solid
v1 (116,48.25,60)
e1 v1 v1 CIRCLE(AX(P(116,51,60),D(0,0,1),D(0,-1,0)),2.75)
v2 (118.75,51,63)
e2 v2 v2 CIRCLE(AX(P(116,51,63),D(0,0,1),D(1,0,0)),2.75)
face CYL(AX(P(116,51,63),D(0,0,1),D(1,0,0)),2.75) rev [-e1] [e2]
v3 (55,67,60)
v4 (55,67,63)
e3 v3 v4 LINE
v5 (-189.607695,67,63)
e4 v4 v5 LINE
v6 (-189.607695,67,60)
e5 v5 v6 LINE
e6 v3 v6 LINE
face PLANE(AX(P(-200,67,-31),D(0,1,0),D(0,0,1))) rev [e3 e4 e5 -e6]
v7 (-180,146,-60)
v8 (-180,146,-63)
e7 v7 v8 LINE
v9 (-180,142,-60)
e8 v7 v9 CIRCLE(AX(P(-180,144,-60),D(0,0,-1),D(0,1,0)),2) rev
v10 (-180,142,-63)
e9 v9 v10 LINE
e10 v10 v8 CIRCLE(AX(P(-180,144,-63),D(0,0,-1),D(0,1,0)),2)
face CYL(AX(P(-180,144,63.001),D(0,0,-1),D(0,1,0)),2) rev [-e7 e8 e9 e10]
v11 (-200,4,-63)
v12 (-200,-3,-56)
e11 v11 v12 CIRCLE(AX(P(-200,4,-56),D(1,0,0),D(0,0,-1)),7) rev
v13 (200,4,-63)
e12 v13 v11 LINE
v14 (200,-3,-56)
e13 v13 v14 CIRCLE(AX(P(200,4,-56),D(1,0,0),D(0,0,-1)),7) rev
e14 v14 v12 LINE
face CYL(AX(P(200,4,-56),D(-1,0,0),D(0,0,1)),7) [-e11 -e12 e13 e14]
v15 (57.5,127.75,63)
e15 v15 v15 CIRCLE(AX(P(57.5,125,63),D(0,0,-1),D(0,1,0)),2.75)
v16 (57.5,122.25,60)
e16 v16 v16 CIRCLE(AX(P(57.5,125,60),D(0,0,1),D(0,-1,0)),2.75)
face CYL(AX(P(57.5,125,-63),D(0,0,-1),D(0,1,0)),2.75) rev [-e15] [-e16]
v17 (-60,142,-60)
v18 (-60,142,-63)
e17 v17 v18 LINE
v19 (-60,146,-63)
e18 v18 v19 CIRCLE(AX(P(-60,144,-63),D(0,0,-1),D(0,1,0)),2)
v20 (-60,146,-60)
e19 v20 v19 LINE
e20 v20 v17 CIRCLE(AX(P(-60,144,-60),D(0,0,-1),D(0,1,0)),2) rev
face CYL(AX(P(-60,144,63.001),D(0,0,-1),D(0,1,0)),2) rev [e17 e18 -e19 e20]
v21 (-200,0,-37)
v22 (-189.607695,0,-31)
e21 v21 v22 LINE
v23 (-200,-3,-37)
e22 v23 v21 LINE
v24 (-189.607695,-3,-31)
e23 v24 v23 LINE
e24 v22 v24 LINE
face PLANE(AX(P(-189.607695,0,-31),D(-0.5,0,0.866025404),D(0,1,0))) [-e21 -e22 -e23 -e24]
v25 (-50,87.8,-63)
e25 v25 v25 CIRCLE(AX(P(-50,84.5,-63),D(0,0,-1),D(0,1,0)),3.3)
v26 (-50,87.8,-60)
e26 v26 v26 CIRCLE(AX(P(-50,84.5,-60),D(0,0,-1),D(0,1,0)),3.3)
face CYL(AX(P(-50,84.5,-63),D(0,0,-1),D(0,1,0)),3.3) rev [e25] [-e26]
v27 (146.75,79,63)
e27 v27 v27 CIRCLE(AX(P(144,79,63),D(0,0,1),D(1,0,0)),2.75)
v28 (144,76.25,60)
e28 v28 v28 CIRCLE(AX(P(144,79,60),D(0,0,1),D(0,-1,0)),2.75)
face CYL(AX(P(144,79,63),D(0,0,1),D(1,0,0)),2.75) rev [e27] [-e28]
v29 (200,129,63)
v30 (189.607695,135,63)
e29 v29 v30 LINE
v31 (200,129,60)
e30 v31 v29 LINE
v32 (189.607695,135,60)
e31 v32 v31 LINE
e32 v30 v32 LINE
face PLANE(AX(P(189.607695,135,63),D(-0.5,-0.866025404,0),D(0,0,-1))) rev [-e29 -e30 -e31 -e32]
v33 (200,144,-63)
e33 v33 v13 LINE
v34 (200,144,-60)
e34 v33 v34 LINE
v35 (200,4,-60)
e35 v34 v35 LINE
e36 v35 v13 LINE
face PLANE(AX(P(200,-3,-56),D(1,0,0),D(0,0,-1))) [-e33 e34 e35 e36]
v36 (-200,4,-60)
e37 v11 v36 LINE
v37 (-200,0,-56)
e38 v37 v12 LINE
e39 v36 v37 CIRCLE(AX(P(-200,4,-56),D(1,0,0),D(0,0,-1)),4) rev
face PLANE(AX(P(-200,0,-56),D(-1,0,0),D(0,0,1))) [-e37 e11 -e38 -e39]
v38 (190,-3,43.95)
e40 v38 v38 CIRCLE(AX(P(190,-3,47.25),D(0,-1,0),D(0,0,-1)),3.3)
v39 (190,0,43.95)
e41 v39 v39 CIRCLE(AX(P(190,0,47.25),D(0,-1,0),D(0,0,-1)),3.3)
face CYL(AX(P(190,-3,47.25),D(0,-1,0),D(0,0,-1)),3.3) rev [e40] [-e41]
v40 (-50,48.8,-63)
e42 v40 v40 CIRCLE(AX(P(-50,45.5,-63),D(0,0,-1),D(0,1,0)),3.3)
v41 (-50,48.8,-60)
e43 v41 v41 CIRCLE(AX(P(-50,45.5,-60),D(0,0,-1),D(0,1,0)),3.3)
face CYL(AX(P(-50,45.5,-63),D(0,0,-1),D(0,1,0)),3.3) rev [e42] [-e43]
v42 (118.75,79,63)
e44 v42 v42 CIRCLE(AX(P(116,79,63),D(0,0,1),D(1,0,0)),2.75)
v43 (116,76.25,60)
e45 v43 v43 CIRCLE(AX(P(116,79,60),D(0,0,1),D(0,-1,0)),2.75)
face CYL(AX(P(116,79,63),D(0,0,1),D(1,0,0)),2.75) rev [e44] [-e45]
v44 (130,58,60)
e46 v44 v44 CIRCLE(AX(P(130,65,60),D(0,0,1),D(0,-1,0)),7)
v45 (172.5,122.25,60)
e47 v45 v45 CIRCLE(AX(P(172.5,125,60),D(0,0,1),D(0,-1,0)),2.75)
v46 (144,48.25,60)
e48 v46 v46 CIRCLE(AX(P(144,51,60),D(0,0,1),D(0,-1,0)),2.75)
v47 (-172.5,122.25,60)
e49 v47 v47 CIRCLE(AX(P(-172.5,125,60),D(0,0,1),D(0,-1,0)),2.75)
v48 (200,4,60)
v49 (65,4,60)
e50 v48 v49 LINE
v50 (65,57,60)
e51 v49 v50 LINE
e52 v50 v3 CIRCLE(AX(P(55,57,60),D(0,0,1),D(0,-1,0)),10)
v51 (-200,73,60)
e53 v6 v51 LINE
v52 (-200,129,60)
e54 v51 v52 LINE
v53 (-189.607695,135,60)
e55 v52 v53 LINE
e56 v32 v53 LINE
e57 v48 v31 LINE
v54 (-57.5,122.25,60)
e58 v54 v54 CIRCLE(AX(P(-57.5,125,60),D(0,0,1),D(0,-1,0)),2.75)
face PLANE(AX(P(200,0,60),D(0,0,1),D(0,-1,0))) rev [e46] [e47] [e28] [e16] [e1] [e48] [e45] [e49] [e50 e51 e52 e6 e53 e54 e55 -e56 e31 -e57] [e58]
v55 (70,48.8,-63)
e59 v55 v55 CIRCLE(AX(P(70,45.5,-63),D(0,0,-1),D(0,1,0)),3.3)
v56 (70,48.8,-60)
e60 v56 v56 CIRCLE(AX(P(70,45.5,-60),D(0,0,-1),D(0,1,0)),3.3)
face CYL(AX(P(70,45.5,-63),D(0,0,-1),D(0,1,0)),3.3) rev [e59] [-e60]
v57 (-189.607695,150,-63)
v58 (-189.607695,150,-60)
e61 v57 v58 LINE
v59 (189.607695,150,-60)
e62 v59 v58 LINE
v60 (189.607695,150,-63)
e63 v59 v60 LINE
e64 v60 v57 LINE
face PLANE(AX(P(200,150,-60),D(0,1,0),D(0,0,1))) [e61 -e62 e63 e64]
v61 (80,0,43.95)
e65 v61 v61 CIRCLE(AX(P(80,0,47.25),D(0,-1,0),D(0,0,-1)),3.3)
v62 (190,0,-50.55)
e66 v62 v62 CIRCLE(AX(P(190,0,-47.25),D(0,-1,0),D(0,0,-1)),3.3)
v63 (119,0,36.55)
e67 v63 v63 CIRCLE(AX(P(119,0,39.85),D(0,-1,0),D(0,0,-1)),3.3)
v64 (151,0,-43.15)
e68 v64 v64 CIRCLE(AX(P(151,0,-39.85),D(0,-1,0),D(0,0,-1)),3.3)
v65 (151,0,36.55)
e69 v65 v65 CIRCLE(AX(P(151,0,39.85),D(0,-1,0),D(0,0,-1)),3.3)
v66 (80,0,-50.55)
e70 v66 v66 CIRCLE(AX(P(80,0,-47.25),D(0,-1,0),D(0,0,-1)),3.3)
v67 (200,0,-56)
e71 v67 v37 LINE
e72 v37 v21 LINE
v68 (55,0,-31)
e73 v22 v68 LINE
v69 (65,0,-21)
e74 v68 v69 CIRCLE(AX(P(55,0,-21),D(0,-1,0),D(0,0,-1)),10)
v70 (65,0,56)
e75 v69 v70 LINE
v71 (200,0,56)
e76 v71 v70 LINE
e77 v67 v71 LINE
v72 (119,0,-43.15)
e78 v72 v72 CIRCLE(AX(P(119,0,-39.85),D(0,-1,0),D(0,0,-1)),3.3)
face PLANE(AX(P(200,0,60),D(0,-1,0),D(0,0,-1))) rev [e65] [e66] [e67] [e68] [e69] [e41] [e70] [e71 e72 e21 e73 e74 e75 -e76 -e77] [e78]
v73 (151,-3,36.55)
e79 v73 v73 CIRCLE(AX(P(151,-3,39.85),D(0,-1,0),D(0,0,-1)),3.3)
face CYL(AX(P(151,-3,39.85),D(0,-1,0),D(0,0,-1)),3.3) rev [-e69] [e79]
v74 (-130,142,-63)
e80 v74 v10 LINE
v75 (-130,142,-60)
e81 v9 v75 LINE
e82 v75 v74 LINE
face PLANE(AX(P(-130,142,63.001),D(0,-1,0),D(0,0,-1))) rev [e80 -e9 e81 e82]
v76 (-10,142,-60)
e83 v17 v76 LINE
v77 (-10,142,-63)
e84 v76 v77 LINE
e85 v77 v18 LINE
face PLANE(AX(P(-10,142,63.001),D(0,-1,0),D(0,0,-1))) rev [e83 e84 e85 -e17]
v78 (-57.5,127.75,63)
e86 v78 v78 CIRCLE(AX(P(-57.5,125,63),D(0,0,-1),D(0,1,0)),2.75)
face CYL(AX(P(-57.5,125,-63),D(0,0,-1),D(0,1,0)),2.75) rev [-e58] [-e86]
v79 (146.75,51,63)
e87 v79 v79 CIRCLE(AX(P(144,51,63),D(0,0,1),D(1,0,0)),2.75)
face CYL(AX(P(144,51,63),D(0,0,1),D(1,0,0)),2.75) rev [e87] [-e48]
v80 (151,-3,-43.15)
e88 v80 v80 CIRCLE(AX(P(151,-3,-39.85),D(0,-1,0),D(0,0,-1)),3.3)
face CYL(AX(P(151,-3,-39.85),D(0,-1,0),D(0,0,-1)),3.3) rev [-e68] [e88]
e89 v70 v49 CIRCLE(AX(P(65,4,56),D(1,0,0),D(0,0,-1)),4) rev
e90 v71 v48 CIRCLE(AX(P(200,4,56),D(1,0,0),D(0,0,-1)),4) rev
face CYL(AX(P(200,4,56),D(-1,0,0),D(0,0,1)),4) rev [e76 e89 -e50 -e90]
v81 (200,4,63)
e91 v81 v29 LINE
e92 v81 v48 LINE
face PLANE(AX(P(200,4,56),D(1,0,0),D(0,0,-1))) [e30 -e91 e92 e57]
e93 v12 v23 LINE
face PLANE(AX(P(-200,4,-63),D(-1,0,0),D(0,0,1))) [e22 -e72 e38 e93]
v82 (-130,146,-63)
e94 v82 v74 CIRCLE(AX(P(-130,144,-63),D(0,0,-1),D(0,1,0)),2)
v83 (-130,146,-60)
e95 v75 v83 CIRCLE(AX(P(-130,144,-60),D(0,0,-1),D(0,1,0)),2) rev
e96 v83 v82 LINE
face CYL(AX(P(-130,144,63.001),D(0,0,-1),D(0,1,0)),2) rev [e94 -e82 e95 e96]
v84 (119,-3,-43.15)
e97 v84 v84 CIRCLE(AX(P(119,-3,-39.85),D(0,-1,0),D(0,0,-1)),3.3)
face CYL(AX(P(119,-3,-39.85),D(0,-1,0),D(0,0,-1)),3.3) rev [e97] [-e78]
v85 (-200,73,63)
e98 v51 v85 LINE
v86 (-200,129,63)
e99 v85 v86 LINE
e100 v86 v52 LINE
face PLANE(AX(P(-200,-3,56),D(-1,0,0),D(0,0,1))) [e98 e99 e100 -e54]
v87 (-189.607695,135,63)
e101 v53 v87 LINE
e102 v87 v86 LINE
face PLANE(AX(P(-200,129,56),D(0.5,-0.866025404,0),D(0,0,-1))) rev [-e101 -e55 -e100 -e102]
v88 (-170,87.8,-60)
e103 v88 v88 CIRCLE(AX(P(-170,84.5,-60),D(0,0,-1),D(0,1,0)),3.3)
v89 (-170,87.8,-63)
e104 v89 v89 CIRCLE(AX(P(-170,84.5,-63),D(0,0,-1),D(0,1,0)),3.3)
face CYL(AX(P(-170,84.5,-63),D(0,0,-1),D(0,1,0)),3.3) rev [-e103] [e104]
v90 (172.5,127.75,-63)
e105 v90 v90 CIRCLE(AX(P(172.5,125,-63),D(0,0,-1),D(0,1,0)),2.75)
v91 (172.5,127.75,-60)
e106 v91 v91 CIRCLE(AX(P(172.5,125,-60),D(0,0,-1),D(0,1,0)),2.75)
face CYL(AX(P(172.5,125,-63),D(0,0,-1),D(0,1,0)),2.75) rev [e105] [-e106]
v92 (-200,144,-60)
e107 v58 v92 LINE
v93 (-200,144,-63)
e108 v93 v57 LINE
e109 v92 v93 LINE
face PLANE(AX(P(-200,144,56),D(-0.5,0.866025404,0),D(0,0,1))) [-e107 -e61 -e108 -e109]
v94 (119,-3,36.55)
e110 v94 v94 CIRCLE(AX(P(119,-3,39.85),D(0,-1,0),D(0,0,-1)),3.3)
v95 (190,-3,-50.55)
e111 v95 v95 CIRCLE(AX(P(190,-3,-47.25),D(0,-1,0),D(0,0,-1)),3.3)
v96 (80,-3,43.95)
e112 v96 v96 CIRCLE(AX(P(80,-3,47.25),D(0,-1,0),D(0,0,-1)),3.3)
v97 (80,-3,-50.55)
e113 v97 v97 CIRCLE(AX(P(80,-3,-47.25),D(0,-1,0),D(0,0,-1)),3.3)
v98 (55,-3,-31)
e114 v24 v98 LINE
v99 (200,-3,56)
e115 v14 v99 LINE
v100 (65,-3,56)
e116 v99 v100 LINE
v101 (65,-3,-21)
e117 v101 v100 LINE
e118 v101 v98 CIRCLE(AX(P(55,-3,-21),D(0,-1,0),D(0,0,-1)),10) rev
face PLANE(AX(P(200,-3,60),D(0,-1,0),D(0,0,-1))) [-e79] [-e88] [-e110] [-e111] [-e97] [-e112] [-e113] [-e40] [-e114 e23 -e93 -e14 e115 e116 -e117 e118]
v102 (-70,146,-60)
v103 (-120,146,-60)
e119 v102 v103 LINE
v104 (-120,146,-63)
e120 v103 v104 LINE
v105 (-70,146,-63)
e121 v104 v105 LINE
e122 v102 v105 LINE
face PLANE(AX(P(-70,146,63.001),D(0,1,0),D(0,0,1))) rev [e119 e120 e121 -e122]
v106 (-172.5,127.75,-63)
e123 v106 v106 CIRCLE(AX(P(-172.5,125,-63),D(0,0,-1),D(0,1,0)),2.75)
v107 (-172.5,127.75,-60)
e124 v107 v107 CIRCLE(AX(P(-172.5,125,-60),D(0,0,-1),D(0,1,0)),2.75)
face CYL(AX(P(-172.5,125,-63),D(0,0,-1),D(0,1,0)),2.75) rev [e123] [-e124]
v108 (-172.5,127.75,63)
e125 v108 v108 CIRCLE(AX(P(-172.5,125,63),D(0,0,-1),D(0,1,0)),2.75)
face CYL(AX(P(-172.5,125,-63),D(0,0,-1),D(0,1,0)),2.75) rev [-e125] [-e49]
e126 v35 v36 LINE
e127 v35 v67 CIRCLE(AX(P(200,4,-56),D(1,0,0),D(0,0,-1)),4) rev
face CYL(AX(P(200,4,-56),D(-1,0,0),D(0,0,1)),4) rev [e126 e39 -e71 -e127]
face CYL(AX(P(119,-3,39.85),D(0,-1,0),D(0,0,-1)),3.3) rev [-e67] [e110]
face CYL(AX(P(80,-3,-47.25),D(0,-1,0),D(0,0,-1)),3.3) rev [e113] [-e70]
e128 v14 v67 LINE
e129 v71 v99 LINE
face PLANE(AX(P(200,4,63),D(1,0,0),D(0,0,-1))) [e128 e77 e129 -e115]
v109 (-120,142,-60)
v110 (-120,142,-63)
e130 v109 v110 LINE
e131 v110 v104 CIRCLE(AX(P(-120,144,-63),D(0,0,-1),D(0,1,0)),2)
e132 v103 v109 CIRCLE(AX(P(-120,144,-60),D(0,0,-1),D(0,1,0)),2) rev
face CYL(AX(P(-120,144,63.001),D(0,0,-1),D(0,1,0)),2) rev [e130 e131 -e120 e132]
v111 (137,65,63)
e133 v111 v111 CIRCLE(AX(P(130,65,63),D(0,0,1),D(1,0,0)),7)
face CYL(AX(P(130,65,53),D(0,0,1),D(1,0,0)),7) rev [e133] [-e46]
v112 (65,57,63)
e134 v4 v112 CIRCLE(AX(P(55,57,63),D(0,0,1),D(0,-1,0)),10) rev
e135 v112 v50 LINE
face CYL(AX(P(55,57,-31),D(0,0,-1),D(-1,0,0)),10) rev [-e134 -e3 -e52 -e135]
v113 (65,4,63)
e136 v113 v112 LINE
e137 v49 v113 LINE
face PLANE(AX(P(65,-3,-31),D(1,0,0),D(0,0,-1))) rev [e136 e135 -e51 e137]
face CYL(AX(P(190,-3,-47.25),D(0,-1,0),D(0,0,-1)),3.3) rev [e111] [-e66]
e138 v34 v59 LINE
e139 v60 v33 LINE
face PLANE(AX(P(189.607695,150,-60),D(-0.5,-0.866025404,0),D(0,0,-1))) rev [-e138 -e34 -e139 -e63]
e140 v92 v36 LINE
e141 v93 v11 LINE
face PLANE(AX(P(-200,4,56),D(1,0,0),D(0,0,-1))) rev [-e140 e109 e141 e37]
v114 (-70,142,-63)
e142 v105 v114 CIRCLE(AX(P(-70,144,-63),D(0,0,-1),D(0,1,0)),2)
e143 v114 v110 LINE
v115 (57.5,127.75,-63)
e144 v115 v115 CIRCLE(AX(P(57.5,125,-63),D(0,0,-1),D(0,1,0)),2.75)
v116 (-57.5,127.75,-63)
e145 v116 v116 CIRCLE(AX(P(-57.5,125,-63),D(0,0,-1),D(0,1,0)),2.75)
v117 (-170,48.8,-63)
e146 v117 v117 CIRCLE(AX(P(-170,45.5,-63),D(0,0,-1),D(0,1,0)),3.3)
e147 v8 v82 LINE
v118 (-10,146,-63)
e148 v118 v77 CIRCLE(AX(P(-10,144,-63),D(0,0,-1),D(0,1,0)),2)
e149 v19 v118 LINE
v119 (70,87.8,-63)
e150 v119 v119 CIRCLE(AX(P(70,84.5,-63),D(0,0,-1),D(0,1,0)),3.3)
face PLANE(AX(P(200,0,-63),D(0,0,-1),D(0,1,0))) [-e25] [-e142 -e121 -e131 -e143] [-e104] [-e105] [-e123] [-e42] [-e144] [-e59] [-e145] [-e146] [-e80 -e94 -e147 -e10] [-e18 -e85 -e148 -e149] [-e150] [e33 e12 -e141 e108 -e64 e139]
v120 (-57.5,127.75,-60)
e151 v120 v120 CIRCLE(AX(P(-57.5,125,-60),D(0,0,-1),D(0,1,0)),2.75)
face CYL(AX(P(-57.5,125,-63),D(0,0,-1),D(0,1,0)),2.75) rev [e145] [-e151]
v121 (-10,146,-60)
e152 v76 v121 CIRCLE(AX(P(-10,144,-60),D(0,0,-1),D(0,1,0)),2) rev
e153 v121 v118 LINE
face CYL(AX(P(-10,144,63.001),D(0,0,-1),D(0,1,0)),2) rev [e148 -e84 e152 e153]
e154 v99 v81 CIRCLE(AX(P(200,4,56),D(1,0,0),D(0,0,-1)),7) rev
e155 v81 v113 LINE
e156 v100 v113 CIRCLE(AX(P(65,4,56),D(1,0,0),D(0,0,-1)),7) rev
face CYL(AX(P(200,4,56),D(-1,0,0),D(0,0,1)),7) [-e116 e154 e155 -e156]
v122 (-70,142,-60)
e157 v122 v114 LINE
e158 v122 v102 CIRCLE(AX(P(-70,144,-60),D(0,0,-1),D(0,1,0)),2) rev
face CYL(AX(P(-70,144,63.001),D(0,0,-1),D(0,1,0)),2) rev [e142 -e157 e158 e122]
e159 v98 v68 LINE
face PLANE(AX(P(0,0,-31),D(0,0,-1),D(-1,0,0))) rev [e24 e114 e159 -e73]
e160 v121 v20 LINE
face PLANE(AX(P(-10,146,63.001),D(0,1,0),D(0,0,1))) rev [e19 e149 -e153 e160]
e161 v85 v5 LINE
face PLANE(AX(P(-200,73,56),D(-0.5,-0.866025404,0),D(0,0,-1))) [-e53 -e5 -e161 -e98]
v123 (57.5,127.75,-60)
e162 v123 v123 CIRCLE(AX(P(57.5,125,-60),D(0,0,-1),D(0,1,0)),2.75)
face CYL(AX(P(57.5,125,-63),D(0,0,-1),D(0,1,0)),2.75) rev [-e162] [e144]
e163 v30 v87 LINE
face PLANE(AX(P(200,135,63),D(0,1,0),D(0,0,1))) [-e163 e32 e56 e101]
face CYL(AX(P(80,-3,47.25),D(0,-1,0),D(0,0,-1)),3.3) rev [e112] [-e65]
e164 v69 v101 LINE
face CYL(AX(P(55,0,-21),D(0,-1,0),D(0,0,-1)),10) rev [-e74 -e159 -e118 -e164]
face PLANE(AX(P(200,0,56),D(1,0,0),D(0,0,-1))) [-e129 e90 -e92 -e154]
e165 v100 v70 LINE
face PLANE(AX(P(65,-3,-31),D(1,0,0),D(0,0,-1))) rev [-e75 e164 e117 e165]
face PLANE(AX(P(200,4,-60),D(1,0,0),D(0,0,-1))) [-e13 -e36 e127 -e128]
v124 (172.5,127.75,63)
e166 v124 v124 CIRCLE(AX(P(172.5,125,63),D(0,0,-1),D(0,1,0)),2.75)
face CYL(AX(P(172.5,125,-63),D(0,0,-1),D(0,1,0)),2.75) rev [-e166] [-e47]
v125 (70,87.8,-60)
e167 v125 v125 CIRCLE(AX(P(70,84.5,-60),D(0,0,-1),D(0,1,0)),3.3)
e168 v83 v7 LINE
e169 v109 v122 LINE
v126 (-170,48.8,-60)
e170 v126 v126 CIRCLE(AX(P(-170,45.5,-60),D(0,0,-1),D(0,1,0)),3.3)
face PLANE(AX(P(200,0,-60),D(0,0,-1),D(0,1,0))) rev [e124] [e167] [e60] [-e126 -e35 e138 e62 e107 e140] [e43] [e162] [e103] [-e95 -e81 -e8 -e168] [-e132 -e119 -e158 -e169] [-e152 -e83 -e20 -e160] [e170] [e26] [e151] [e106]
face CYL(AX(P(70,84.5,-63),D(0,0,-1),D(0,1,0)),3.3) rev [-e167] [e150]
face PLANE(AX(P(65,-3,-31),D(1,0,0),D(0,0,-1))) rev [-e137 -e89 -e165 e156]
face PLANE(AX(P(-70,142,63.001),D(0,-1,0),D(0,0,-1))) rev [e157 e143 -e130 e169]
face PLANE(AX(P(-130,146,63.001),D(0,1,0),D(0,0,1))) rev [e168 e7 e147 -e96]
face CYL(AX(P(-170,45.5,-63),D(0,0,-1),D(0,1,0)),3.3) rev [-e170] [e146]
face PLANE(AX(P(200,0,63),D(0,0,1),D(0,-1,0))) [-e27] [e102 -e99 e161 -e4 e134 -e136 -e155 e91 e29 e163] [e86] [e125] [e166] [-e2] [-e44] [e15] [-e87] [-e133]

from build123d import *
from OCP.BRepFilletAPI import BRepFilletAPI_MakeChamfer

# Parameters (mm, degrees)
ODGI_CIE_BAZOWE1_DEPTH     = 200
SZKIC25_W                  = 265
SZKIC25_H                  = 70
WYTNIJ_WYCI_GNI_CIE2_DEPTH = 94
SFAZOWANIE1_SIZE           = 6
SFAZOWANIE1_SIZE2          = 10.392304845
ZAOKR_GLENIE1_R            = 10
OTW_R_POD_RUB_M51_D        = 5.5
OTW_R_POD_RUB_M51_DEPTH    = 3
OTW_R_POD_RUB_M61_D        = 6.6
OTW_R_POD_RUB_M61_DEPTH    = 3
OTW_R_POD_RUB_M52_D        = 5.5
OTW_R_POD_RUB_M62_D        = 6.6
OTW_R_POD_RUB_M62_DEPTH    = 10
OTW_R_POD_RUB_M62_TIP      = 1.982840043
WYTNIJ_WYCI_GNI_CIE3_REACH = 281.957
SZKIC48_R                  = 7
WYTNIJ_WYCI_GNI_CIE4_DEPTH = 10


# Sheet-metal steps are written as plain solids
with BuildPart() as part:
    # Szkic1 → Odgięcie bazowe1 (new, symmetric)
    with BuildSketch(Plane(origin=(0, 0, 0), x_dir=(0, 0, -1), z_dir=(1, 0, 0))):
        with BuildLine():
            Line((-60, 135), (-60, 4))
            ThreePointArc((-60, 4), (-58.828427125, 1.171572875), (-56, 0))
            Line((-56, 0), (56, 0))
            ThreePointArc((56, 0), (58.828427125, 1.171572875), (60, 4))
            Line((60, 4), (60, 150))
            Line((60, 150), (63, 150))
            Line((63, 150), (63, 4))
            ThreePointArc((63, 4), (60.949747468, -0.949747468), (56, -3))
            Line((56, -3), (-56, -3))
            ThreePointArc((-56, -3), (-60.949747468, -0.949747468), (-63, 4))
            Line((-63, 4), (-63, 135))
            Line((-63, 135), (-60, 135))
        make_face()
    extrude(amount=ODGI_CIE_BAZOWE1_DEPTH, both=True)

    # Szkic25 → Wytnij-wyciągnięcie2 (cut)
    with BuildSketch(Plane.XY.offset(63)):
        with Locations((-67.5, 32)):
            Rectangle(SZKIC25_W, SZKIC25_H)
    extrude(amount=-WYTNIJ_WYCI_GNI_CIE2_DEPTH, mode=Mode.SUBTRACT)

    # Sfazowanie1: one chamfer whose edges measure the first distance from different faces: ONE call of the kernel's chamfer builder (chamfer() names one face for all edges)
    sfazowanie1_edges_1 = [part.edges().sort_by_distance(p)[0] for p in [
        (-200, 150, -61.5),
        (-200, -1.5, -31),
    ]]
    sfazowanie1_side_1 = [part.faces().sort_by_distance(p)[0] for p in [
        (-200, -1.436894117, -43.5),
    ]]
    sfazowanie1_edges_2 = [part.edges().sort_by_distance(p)[0] for p in [
        (-200, 135, 61.5),
        (-200, 67, 61.5),
    ]]
    sfazowanie1_side_2 = [part.faces().sort_by_distance(p)[0] for p in [
        (-200, 101, 61.5),
    ]]
    sfazowanie1_edges_3 = [part.edges().sort_by_distance(p)[0] for p in [
        (200, 150, -61.5),
        (200, 135, 61.5),
    ]]
    sfazowanie1_side_3 = [part.faces().sort_by_distance(p)[0] for p in [
        (200, 0.451769567, 59.548230433),
    ]]
    sfazowanie1 = BRepFilletAPI_MakeChamfer(part.part.solid().wrapped)
    for e in sfazowanie1_edges_1:
        sfazowanie1.Add(SFAZOWANIE1_SIZE, SFAZOWANIE1_SIZE2, e.wrapped, sfazowanie1_side_1[0].wrapped)  # the first distance lies on this face
    for e in sfazowanie1_edges_2:
        sfazowanie1.Add(SFAZOWANIE1_SIZE, SFAZOWANIE1_SIZE2, e.wrapped, sfazowanie1_side_2[0].wrapped)  # the first distance lies on this face
    for e in sfazowanie1_edges_3:
        sfazowanie1.Add(SFAZOWANIE1_SIZE, SFAZOWANIE1_SIZE2, e.wrapped, sfazowanie1_side_3[0].wrapped)  # the first distance lies on this face
    add(Compound.cast(sfazowanie1.Shape()), mode=Mode.REPLACE)

    # Zaokrąglenie1
    zaokr_glenie1_edges = [part.edges().sort_by_distance(p)[0] for p in [
        (65, -1.5, -31),
        (65, 67, 61.5),
    ]]
    fillet(zaokr_glenie1_edges, radius=ZAOKR_GLENIE1_R)

    # Otwór pod śrubę M51
    with Locations(Plane.XY.offset(63)):
        with Locations((144, 79), (116, 79), (144, 51), (116, 51), (130, 65)):
            Hole(OTW_R_POD_RUB_M51_D / 2, depth=OTW_R_POD_RUB_M51_DEPTH)

    # Otwór pod śrubę M61
    with Locations(Plane(origin=(0, 0, -63), x_dir=(-1, 0, 0), z_dir=(0, 0, -1))):
        with Locations((-70, 84.5), (-70, 45.5), (50, 84.5), (50, 45.5), (170, 84.5), (170, 45.5)):
            Hole(OTW_R_POD_RUB_M61_D / 2, depth=OTW_R_POD_RUB_M61_DEPTH)

    # Otwór pod śrubę M52 (through all)
    with Locations(Plane(origin=(0, 0, -63), x_dir=(-1, 0, 0), z_dir=(0, 0, -1))):
        with Locations((-172.5, 125), (-57.5, 125), (57.5, 125), (172.5, 125)):
            Hole(OTW_R_POD_RUB_M52_D / 2)

    # Otwór pod śrubę M62
    with Locations(Plane(origin=(0, -3, 0), x_dir=(-1, 0, 0), z_dir=(0, -1, 0))):
        with Locations((-190, 47.25), (-80, 47.25), (-151, 39.85), (-119, 39.85), (-190, -47.25), (-151, -39.85), (-119, -39.85), (-80, -47.25)):
            Hole(OTW_R_POD_RUB_M62_D / 2, depth=OTW_R_POD_RUB_M62_DEPTH)
            with Locations((0, 0, -(OTW_R_POD_RUB_M62_DEPTH + OTW_R_POD_RUB_M62_TIP / 2))):  # 118° drill point
                Cone(0, OTW_R_POD_RUB_M62_D / 2, OTW_R_POD_RUB_M62_TIP, mode=Mode.SUBTRACT)

    # Szkic43 → Wytnij-wyciągnięcie3 (cut, up to next)
    with BuildSketch(Plane(origin=(0, 0, -63), x_dir=(-1, 0, 0), z_dir=(0, 0, -1)), mode=Mode.PRIVATE) as wytnij_wyci_gni_cie3_sk1:
        with BuildLine():
            Line((130, 146), (180, 146))
            ThreePointArc((180, 146), (182, 144), (180, 142))
            Line((180, 142), (130, 142))
            ThreePointArc((130, 142), (128, 144), (130, 146))
        make_face()
    wytnij_wyci_gni_cie3_tool1 = extrude(wytnij_wyci_gni_cie3_sk1.sketch, amount=-WYTNIJ_WYCI_GNI_CIE3_REACH, mode=Mode.PRIVATE) & part.part
    # Szkic43 → Wytnij-wyciągnięcie3 (cut, up to next)
    with BuildSketch(Plane(origin=(0, 0, -63), x_dir=(-1, 0, 0), z_dir=(0, 0, -1)), mode=Mode.PRIVATE) as wytnij_wyci_gni_cie3_sk2:
        with BuildLine():
            Line((70, 146), (120, 146))
            ThreePointArc((120, 146), (122, 144), (120, 142))
            Line((120, 142), (70, 142))
            ThreePointArc((70, 142), (68, 144), (70, 146))
        make_face()
    wytnij_wyci_gni_cie3_tool2 = extrude(wytnij_wyci_gni_cie3_sk2.sketch, amount=-WYTNIJ_WYCI_GNI_CIE3_REACH, mode=Mode.PRIVATE) & part.part
    # Szkic43 → Wytnij-wyciągnięcie3 (cut, up to next)
    with BuildSketch(Plane(origin=(0, 0, -63), x_dir=(-1, 0, 0), z_dir=(0, 0, -1)), mode=Mode.PRIVATE) as wytnij_wyci_gni_cie3_sk3:
        with BuildLine():
            Line((10, 146), (60, 146))
            ThreePointArc((60, 146), (62, 144), (60, 142))
            Line((60, 142), (10, 142))
            ThreePointArc((10, 142), (8, 144), (10, 146))
        make_face()
    wytnij_wyci_gni_cie3_tool3 = extrude(wytnij_wyci_gni_cie3_sk3.sketch, amount=-WYTNIJ_WYCI_GNI_CIE3_REACH, mode=Mode.PRIVATE) & part.part
    add(wytnij_wyci_gni_cie3_tool1.solids().sort_by_distance((-155, 144, -63))[0], mode=Mode.SUBTRACT)
    add(wytnij_wyci_gni_cie3_tool2.solids().sort_by_distance((-95, 144, -63))[0], mode=Mode.SUBTRACT)
    add(wytnij_wyci_gni_cie3_tool3.solids().sort_by_distance((-35, 144, -63))[0], mode=Mode.SUBTRACT)

    # Szkic48 → Wytnij-wyciągnięcie4 (cut)
    with BuildSketch(Plane.XY.offset(63)):
        with Locations((130, 65)):
            Circle(SZKIC48_R)
    extrude(amount=-WYTNIJ_WYCI_GNI_CIE4_DEPTH, mode=Mode.SUBTRACT)


solid = part.part
